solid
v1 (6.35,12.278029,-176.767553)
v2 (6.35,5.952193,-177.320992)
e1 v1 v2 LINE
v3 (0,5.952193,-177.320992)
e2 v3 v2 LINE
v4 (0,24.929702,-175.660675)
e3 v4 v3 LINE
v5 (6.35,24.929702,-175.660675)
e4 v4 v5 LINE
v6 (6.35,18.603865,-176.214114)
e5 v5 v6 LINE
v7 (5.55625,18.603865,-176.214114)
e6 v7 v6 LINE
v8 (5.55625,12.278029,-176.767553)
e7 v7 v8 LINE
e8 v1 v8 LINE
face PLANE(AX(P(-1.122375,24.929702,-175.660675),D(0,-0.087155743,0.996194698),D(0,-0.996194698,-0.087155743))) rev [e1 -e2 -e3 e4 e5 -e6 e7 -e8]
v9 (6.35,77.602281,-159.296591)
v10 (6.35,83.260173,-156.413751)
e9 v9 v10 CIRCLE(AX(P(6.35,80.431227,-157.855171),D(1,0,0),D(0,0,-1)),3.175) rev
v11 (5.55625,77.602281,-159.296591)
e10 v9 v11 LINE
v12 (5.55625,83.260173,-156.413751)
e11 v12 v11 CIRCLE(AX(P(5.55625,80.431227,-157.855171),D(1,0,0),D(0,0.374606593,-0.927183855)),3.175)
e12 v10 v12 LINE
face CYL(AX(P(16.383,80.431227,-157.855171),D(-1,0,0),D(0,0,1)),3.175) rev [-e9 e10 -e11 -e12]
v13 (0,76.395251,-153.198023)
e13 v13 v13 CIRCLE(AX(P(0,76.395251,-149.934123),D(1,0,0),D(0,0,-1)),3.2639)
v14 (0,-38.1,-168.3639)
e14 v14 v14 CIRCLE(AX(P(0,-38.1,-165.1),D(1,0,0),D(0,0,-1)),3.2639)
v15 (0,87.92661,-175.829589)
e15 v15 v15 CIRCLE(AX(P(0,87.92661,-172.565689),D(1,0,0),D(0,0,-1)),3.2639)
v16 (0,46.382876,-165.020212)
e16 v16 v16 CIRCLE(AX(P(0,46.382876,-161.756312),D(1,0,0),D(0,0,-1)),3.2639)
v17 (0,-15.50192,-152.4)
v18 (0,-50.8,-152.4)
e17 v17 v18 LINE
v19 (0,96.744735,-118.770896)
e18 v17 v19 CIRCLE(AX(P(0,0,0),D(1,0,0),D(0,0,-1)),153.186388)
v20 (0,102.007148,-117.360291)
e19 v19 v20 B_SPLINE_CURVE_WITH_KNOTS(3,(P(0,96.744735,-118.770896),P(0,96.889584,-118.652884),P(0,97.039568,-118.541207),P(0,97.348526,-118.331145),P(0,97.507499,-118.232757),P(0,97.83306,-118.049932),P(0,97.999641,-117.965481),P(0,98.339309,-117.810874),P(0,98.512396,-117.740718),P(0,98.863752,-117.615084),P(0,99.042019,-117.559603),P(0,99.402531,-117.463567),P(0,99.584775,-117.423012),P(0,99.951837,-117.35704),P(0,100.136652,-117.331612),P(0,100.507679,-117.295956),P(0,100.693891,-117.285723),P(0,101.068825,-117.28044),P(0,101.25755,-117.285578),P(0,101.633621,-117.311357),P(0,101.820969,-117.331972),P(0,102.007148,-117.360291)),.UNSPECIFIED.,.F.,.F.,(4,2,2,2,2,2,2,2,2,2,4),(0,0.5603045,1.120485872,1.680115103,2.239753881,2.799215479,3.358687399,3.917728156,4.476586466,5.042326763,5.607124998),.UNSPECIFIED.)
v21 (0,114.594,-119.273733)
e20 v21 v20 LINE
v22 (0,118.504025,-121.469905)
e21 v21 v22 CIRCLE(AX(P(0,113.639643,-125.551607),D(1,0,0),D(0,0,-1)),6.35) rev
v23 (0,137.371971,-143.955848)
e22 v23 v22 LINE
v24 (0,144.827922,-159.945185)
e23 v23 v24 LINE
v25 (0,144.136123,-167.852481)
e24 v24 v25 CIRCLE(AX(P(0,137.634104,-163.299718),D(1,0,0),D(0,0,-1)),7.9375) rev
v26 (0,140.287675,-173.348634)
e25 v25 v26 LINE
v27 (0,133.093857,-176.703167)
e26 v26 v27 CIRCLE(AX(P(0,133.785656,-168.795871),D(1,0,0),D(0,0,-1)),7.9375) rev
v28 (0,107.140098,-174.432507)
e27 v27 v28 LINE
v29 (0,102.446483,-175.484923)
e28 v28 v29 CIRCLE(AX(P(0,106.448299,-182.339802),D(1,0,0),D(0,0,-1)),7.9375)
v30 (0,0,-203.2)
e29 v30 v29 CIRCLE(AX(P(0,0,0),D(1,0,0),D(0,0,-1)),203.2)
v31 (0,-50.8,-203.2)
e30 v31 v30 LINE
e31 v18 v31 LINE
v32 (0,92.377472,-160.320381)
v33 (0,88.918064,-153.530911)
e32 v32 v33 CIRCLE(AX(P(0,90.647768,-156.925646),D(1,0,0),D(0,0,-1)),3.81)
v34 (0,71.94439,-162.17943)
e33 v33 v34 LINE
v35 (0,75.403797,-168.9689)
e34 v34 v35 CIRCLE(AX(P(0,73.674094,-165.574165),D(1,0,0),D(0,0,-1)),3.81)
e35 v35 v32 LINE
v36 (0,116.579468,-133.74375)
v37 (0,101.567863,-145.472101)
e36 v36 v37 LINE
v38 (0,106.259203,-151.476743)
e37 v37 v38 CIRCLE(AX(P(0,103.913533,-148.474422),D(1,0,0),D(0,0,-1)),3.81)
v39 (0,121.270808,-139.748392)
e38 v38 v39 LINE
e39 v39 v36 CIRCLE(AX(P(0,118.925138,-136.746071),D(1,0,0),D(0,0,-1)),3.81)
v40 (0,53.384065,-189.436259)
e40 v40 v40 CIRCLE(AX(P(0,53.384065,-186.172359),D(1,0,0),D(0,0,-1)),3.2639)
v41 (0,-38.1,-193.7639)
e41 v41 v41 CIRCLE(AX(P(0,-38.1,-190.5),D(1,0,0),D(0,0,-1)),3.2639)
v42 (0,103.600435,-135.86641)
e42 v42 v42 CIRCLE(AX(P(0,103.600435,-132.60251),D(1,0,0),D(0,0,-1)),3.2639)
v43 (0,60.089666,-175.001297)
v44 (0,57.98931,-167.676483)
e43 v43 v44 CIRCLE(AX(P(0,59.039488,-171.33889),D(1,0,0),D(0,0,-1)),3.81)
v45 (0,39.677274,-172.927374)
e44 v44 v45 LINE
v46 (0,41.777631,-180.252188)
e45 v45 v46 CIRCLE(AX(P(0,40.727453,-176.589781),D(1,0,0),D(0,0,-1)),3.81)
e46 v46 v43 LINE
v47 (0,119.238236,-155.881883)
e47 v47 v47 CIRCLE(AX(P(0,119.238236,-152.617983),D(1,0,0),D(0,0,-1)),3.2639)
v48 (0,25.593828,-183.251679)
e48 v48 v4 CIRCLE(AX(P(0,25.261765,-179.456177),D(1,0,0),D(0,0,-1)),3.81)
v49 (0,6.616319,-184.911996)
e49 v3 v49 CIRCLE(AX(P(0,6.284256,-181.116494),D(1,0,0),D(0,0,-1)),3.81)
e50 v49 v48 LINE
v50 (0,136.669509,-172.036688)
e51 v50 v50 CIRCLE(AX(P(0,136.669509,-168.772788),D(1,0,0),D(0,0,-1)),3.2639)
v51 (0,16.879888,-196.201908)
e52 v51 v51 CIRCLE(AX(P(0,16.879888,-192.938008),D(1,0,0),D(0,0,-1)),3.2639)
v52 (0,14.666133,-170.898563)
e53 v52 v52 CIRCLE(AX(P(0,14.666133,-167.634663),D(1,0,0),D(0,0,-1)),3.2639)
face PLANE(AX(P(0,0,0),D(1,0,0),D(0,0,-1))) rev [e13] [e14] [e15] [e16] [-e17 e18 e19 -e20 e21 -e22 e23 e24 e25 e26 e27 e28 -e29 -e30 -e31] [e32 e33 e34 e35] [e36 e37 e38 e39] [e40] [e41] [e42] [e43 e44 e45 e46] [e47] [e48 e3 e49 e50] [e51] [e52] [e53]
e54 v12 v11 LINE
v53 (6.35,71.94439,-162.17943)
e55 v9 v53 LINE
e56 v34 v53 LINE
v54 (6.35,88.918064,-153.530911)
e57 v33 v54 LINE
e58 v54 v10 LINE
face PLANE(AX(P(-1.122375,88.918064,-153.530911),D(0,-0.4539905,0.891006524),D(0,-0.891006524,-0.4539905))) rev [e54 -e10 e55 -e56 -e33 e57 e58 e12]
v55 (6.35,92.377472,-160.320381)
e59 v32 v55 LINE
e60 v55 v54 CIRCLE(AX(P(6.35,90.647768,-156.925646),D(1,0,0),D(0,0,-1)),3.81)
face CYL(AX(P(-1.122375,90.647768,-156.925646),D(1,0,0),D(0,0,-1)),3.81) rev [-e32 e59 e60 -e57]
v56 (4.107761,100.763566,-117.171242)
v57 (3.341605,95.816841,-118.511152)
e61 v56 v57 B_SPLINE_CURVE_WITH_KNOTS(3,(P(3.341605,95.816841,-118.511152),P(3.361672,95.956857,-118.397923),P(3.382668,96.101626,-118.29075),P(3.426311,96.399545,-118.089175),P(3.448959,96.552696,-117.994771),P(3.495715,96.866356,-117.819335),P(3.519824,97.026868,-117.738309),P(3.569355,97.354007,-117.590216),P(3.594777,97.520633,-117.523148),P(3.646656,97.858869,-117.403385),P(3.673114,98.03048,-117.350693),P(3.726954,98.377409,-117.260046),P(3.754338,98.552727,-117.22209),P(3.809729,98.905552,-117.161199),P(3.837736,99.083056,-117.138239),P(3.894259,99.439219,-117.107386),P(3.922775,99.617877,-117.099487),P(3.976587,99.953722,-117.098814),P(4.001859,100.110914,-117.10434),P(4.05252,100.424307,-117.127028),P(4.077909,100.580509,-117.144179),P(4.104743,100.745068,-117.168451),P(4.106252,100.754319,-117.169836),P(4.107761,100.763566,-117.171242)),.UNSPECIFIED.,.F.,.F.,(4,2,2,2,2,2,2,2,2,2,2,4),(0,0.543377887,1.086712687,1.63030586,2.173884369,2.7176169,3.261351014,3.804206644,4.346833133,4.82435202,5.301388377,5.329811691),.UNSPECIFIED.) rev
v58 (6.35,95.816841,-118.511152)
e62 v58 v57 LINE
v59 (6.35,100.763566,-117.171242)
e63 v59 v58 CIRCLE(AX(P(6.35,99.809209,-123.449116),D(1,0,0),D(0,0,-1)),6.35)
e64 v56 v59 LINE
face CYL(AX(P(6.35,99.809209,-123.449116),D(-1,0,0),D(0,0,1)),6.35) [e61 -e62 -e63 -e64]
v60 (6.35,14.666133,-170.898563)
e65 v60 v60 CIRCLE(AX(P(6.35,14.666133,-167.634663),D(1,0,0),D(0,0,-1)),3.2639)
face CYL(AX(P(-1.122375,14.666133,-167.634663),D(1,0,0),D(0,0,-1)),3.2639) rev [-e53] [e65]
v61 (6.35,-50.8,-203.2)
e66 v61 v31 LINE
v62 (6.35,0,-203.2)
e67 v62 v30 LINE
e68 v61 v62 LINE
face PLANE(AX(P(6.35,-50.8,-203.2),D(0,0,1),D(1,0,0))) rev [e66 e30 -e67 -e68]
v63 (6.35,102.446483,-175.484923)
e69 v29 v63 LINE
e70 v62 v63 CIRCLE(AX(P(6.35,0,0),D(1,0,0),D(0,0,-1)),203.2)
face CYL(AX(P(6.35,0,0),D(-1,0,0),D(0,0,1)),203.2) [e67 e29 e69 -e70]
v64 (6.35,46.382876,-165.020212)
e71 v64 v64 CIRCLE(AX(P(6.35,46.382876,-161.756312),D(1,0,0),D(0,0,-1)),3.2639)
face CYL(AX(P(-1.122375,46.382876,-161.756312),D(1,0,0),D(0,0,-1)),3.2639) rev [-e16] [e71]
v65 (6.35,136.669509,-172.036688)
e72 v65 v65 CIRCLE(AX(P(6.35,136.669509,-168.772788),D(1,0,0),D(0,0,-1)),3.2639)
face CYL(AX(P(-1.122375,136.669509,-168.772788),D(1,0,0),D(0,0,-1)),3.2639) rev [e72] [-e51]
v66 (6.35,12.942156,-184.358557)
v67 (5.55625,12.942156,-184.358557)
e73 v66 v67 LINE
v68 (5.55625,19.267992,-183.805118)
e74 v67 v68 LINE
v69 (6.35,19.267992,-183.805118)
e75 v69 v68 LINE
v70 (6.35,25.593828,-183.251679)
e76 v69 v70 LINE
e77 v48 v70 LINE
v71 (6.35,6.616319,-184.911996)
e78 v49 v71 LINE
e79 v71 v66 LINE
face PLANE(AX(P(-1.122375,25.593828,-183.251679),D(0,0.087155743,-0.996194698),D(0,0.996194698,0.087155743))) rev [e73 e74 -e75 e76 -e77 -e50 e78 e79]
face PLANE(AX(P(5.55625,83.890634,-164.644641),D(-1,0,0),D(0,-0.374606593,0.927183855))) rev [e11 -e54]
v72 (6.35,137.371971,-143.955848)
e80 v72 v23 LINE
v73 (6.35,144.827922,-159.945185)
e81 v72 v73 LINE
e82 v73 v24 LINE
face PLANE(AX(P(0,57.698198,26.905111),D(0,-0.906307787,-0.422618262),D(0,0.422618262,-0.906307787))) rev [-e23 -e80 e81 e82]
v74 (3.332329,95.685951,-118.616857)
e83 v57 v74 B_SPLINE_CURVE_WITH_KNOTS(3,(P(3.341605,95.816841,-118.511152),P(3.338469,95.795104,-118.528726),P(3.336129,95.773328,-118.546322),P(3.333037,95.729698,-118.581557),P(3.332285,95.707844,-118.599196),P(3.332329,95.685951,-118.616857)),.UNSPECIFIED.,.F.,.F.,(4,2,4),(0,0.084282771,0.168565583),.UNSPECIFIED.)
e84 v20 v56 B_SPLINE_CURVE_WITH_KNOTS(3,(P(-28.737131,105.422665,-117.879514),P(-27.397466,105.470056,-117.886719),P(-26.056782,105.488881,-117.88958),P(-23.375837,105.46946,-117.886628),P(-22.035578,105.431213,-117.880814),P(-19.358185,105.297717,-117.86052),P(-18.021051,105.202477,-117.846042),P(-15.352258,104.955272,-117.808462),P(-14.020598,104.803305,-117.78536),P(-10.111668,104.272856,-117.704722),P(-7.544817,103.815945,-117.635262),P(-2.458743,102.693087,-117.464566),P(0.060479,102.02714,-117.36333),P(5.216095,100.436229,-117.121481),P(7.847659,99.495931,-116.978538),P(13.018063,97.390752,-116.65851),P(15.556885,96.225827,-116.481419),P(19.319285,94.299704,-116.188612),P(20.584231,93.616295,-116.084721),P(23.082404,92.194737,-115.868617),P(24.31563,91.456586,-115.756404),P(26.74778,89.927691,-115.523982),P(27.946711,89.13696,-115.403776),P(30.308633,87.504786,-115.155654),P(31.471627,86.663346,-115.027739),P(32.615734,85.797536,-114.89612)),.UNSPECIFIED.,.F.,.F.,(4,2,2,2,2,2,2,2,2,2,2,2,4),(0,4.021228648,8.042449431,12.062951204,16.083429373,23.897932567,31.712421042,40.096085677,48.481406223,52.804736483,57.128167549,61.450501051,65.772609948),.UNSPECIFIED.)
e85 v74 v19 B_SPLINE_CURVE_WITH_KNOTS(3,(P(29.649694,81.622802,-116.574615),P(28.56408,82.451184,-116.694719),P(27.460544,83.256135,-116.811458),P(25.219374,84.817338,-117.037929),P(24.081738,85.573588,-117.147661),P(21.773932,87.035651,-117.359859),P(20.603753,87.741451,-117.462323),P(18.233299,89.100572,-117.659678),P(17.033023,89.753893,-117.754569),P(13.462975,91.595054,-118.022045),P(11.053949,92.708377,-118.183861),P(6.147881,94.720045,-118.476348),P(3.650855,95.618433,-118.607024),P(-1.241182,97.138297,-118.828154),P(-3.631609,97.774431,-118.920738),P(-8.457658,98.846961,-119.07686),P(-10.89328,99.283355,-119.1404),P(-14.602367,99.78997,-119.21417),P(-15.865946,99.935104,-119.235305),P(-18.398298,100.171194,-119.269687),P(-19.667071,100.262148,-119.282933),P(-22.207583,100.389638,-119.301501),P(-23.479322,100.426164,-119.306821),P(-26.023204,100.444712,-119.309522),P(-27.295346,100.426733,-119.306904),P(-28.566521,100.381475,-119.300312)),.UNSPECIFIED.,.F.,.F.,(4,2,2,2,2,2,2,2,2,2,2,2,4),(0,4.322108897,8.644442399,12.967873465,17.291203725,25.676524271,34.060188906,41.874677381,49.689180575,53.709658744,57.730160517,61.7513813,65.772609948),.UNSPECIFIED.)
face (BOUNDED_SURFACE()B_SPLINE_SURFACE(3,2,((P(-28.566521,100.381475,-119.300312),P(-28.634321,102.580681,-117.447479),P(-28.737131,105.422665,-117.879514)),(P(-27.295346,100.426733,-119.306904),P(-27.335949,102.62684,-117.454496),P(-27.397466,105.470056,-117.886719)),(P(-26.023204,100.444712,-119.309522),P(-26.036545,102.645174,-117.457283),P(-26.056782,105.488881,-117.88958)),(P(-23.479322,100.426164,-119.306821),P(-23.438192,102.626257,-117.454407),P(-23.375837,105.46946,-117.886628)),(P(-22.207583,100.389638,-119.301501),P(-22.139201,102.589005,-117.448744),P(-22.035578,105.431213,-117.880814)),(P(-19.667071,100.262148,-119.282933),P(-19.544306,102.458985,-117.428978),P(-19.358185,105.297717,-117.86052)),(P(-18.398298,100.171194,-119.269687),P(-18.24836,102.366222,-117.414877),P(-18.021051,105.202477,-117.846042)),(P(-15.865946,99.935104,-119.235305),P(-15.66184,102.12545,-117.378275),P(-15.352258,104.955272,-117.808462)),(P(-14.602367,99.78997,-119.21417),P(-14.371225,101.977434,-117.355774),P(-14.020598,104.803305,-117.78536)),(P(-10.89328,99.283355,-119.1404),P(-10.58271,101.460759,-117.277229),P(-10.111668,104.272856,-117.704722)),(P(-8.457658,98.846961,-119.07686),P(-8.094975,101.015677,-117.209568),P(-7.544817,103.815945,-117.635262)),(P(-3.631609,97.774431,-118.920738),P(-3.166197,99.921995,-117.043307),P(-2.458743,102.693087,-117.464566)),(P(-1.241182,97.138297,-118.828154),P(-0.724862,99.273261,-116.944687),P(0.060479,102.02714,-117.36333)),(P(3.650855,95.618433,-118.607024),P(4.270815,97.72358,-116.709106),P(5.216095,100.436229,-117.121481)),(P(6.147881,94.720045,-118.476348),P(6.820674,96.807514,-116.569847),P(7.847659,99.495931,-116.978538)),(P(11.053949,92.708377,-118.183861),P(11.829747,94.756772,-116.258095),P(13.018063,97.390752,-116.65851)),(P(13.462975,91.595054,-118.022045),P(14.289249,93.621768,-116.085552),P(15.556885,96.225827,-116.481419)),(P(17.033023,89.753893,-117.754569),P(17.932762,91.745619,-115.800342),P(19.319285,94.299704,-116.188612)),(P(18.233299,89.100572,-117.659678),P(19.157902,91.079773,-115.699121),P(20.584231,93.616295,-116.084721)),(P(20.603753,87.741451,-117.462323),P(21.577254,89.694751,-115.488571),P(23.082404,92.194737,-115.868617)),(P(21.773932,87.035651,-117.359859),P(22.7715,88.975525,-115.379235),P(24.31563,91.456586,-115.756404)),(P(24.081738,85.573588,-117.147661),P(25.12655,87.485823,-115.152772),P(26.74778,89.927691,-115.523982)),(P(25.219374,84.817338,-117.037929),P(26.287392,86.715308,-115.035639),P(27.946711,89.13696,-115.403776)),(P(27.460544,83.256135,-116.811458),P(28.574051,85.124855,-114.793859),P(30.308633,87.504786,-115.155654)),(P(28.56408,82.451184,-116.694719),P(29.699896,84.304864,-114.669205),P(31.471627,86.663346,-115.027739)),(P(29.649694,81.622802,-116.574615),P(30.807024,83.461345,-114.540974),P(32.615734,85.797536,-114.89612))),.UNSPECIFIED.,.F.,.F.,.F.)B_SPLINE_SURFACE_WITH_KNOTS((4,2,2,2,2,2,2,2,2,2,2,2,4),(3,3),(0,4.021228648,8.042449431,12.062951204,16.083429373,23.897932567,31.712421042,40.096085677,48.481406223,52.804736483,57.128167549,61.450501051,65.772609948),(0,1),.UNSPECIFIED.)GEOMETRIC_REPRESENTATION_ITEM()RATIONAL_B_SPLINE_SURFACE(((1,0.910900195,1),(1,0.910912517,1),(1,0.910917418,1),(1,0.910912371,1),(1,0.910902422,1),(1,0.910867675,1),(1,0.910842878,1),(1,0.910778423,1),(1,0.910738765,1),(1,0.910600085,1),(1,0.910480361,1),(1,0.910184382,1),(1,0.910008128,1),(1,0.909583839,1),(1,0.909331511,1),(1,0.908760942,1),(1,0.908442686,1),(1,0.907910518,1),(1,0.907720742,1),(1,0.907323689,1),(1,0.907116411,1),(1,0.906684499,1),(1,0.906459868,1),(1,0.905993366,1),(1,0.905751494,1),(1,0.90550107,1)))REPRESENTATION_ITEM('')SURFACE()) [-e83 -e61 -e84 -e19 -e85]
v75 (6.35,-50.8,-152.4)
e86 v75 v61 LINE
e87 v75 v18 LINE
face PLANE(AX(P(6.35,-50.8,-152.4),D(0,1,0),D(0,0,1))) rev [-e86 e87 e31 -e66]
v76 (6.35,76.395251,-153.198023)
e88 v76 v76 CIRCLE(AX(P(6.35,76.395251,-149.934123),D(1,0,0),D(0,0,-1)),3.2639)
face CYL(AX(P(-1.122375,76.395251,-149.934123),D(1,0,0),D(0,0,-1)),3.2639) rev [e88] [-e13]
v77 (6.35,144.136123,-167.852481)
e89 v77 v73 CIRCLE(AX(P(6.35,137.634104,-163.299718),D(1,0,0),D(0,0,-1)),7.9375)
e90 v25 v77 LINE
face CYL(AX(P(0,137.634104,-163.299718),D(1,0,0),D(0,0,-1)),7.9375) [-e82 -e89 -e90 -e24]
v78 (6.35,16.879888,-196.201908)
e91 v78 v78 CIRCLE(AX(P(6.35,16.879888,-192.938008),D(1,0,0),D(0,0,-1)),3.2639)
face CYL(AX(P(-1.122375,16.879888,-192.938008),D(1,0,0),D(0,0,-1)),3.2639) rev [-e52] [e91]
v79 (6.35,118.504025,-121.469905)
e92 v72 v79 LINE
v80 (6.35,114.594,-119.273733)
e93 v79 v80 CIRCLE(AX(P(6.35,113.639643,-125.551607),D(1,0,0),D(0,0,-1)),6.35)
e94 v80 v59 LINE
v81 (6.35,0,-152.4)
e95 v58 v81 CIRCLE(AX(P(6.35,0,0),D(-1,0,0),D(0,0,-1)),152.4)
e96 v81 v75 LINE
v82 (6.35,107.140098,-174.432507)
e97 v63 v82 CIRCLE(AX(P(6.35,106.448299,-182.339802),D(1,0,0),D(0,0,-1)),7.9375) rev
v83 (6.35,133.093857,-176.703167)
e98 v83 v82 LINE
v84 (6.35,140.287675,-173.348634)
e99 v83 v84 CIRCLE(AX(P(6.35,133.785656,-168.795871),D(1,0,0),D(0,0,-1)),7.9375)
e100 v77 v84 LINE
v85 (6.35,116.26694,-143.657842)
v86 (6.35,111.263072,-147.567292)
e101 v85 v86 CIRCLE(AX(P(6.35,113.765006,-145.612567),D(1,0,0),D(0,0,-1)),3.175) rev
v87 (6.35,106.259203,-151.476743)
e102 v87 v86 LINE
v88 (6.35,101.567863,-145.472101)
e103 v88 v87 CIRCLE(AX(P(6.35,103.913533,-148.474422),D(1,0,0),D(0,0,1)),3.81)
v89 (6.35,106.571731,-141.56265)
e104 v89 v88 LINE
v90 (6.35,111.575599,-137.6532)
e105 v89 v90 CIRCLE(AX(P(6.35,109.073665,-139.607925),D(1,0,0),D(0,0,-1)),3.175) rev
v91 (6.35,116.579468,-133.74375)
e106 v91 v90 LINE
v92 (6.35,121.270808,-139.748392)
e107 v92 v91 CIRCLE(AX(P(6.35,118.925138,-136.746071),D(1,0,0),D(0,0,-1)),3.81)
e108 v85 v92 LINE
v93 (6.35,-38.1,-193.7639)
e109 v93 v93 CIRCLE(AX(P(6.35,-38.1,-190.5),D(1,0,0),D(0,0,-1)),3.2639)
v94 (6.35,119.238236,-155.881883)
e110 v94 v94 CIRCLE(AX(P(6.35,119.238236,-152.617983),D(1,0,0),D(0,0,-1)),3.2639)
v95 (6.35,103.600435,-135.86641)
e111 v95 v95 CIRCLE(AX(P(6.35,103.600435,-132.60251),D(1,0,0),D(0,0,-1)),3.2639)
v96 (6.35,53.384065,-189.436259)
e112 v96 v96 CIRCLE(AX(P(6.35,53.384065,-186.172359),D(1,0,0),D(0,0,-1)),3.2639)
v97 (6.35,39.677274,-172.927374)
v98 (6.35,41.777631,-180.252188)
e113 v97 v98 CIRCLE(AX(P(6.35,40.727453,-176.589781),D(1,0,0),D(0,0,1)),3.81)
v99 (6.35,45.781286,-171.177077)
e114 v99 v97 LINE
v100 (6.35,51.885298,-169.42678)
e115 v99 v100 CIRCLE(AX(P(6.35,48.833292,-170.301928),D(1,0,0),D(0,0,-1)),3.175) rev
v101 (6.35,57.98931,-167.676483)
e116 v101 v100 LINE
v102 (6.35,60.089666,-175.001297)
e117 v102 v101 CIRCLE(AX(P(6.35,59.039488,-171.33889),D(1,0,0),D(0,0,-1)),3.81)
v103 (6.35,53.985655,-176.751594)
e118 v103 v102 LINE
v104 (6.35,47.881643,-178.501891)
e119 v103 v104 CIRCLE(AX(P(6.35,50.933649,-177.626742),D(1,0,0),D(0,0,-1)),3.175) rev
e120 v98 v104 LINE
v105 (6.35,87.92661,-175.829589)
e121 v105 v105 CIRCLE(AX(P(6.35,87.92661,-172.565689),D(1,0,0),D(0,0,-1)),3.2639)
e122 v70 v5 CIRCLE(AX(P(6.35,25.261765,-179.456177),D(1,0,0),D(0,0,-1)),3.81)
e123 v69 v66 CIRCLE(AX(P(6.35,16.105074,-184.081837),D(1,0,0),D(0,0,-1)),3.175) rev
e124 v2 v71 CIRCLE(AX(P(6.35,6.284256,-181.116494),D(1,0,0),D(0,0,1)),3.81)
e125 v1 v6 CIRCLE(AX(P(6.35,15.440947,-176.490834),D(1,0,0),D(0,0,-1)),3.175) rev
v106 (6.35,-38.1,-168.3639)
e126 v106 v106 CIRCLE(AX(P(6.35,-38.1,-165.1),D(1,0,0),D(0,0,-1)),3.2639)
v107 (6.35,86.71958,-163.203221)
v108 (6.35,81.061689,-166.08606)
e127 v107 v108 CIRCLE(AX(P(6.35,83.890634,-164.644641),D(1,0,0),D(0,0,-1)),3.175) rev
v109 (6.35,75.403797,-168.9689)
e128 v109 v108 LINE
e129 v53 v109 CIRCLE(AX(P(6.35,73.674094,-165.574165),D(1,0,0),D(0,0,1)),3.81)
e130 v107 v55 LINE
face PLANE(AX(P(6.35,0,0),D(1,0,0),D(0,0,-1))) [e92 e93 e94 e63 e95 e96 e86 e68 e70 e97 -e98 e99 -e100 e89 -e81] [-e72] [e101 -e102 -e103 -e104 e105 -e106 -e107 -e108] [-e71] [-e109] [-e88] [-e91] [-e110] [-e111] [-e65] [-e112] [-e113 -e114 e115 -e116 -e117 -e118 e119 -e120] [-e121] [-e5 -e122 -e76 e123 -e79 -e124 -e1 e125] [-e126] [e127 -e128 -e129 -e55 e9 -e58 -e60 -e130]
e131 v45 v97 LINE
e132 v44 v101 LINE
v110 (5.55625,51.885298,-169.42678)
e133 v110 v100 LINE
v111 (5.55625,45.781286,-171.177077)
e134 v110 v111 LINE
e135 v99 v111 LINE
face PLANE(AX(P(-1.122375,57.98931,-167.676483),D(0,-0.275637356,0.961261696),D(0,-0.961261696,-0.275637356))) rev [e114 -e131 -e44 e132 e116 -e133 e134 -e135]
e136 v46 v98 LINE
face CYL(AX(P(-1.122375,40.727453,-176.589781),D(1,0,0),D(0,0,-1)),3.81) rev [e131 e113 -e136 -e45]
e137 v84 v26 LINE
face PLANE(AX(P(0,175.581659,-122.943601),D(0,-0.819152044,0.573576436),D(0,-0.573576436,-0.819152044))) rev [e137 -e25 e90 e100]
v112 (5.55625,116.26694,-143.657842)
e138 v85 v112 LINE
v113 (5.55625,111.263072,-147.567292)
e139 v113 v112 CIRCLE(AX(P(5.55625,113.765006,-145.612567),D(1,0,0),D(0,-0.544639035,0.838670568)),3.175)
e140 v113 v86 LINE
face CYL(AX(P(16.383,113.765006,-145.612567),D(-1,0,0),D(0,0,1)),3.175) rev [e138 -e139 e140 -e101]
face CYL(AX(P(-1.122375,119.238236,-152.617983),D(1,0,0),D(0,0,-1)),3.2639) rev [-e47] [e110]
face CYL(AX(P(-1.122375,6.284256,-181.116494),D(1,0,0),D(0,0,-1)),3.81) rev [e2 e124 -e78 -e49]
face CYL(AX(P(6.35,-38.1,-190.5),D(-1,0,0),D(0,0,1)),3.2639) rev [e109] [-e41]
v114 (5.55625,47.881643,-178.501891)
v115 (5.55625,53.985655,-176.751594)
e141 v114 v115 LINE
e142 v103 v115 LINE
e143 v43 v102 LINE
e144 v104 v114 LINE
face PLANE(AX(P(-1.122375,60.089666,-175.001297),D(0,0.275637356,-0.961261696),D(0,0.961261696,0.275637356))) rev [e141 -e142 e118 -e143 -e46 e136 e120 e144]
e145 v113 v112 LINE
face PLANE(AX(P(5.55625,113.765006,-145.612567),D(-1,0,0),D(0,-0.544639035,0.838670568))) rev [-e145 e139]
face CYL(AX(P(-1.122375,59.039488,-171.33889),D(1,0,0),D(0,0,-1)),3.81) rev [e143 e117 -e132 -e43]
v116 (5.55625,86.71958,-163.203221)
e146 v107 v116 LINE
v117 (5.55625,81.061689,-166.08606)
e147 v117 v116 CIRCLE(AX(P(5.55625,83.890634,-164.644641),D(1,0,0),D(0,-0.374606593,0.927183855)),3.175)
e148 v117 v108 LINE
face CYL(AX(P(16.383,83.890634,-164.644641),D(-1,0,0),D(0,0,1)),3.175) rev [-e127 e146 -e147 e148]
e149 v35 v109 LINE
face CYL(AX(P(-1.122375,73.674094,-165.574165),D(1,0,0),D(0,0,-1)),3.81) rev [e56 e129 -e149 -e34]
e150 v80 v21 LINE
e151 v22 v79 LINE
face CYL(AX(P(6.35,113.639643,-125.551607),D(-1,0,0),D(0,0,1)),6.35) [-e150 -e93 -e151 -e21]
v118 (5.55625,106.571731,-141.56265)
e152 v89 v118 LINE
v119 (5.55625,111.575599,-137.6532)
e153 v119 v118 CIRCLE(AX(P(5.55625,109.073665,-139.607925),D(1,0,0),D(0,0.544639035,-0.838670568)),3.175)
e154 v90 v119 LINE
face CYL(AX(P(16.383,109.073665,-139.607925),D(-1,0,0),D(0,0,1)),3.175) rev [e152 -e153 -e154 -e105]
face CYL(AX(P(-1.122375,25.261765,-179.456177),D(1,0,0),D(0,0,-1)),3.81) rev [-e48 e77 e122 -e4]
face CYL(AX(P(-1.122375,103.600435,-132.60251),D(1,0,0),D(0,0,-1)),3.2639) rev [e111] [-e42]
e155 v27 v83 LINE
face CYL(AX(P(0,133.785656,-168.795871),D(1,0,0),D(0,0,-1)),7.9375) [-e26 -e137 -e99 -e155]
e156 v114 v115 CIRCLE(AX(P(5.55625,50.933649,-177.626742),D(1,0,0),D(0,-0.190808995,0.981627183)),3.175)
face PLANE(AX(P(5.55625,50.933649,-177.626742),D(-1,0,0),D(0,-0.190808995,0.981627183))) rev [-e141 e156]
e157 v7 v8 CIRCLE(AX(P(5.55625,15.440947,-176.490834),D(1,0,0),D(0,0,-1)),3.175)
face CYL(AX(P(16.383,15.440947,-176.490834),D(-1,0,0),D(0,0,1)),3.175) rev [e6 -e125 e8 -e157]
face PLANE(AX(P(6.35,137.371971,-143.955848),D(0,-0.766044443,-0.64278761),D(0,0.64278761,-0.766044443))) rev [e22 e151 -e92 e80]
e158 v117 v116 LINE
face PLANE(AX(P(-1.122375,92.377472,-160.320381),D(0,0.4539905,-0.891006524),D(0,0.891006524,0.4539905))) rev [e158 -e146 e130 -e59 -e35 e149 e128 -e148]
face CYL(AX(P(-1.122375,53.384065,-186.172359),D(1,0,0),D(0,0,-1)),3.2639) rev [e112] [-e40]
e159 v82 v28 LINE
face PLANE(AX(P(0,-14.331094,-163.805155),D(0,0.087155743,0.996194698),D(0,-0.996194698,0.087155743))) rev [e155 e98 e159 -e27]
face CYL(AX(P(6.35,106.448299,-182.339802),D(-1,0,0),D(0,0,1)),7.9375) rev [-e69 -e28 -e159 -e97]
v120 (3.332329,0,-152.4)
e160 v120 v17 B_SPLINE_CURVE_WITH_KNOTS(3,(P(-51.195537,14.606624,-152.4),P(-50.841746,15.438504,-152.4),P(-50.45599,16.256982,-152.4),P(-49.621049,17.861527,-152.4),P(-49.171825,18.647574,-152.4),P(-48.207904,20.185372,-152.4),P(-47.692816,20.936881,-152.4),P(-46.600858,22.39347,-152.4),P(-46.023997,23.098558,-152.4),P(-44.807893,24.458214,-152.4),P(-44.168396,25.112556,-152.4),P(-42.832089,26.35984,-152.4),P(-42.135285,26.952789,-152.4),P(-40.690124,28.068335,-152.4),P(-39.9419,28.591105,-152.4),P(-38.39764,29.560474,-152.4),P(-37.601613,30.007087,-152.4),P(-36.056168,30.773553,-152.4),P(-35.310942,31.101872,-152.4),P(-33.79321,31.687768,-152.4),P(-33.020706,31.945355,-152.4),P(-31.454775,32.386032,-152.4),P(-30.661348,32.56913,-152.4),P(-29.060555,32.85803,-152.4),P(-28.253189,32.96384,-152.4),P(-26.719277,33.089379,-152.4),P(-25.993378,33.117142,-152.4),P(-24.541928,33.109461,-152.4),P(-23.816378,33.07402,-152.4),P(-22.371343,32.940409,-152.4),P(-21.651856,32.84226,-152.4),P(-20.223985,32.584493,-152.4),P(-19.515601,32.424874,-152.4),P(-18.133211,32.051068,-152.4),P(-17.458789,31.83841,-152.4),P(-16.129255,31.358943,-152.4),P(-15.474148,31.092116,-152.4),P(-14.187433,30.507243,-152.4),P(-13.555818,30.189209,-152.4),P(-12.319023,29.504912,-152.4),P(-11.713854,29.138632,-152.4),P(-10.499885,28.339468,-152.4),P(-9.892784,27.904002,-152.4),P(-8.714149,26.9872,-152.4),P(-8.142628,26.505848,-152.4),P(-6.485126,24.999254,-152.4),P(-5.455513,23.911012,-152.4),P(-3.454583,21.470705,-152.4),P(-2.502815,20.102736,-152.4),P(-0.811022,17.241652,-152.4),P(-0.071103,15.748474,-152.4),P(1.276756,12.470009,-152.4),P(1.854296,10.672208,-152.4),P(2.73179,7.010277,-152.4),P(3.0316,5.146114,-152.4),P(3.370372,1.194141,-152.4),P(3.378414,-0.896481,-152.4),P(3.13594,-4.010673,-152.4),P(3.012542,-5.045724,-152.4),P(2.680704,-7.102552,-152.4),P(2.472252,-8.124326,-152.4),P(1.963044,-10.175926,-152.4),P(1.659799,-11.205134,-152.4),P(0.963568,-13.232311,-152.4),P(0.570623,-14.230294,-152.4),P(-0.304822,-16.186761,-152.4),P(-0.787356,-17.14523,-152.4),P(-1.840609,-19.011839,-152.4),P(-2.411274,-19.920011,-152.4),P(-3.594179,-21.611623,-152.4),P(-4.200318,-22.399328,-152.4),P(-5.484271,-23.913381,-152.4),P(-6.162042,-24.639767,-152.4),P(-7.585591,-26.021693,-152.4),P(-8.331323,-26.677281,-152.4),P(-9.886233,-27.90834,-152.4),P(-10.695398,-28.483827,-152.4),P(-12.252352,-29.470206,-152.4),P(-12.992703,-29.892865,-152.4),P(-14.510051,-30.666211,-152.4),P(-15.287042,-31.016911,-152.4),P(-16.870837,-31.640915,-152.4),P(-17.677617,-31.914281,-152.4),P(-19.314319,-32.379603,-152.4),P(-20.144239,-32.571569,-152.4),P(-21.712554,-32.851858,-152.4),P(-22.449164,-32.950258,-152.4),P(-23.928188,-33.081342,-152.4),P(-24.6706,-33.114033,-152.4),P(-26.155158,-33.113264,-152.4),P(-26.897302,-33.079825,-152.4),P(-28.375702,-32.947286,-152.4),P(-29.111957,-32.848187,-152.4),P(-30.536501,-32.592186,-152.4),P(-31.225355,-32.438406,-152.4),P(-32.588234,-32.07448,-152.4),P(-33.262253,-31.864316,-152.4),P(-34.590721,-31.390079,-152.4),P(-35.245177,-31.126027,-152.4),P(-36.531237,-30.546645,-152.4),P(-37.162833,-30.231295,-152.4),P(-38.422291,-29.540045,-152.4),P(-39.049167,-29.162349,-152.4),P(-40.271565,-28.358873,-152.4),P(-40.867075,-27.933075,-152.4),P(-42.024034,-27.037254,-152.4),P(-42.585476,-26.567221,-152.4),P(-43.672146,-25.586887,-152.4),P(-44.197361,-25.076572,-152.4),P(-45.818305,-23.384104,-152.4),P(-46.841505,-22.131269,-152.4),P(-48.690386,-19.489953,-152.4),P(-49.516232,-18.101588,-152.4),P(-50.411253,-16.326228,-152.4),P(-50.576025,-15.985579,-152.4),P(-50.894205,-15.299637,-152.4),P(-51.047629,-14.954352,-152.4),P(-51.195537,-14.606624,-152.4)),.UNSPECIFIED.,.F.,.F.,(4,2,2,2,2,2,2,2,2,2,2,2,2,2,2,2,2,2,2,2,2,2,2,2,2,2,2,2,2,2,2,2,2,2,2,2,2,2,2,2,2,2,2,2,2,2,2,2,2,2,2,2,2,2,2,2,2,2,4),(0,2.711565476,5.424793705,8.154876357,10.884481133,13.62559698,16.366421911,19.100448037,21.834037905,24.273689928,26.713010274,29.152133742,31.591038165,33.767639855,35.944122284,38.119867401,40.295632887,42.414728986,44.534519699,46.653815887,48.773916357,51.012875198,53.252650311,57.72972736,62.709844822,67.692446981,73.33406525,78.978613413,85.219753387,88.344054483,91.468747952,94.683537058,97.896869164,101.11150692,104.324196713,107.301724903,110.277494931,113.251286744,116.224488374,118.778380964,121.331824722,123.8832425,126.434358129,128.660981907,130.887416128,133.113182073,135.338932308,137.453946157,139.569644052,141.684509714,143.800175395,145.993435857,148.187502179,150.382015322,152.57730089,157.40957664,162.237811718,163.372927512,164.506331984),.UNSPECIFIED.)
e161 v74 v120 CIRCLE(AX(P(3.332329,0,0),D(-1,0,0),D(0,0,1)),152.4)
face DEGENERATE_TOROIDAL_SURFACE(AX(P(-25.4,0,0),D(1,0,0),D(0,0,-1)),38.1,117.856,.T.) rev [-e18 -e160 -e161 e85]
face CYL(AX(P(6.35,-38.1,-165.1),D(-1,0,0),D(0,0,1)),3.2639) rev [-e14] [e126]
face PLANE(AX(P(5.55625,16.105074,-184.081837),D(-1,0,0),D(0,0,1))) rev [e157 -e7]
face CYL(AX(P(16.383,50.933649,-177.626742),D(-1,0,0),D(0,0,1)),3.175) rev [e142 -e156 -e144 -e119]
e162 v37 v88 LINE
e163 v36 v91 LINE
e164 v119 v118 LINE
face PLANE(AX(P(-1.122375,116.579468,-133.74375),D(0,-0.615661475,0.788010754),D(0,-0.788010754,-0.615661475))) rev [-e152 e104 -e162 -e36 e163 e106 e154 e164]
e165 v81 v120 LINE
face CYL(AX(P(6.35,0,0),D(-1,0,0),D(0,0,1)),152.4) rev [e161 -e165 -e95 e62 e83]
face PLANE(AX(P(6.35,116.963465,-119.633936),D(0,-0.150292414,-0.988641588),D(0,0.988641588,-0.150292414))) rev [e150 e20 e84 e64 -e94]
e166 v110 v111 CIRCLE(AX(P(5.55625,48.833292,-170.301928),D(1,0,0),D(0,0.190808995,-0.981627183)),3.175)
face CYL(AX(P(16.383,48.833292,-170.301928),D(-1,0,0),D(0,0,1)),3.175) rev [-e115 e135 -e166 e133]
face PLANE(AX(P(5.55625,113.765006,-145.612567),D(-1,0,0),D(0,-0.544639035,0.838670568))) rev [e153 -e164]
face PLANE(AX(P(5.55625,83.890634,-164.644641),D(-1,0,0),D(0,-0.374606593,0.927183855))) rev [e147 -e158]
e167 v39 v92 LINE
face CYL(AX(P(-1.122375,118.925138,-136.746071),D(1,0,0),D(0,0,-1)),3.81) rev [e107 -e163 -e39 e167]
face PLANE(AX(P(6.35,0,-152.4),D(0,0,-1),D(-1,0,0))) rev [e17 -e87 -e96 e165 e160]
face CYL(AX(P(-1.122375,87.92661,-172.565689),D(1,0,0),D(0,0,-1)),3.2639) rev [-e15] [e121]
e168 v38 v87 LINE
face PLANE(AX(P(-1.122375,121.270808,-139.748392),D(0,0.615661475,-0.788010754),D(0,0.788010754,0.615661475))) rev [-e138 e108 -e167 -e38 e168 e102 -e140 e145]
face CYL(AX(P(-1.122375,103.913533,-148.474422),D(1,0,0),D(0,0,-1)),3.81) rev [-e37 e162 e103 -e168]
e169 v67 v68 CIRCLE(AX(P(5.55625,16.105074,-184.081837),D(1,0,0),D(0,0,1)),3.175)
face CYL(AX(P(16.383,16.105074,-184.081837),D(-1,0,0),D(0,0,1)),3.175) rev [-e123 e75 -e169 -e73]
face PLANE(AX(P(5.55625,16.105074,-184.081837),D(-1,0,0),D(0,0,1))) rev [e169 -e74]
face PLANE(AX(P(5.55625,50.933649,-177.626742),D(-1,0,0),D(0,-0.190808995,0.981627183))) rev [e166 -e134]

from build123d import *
from build123d.topology import SkipClean

# Parameters (mm, degrees)
SKETCH1_R               = 3.2639
BOSS_EXTRUDE1_DEPTH     = 6.35
FILLET1_R               = 6.35
SKETCH6_R               = 3.2639
CUT_EXTRUDE1_DEPTH      = 246.360186308
CUT_EXTRUDE2_START      = -0.79375
CUT_EXTRUDE2_DEPTH      = 10.82675
CIRPATTERN1_COUNT       = 4
CIRPATTERN1_ANGLE       = 33
BOSS_EXTRUDE2_DEPTH     = 6.35
CUT_EXTRUDE3_DEPTH      = 251.739762675
CUT_EXTRUDE3_DEPTH_BACK = 251.739762675
SKETCH9_R               = 3.2639
FILLET2_R               = 7.9375


with BuildPart() as part:
    # Sketch1 → Boss-Extrude1 (new body)
    with BuildSketch(Plane(origin=(0, 0, 0), x_dir=(0, 0, -1), z_dir=(1, 0, 0))):
        with BuildLine():
            Line((152.4, 0), (152.4, -50.8))
            Line((152.4, -50.8), (203.2, -50.8))
            Line((203.2, -50.8), (203.2, 0))
            ThreePointArc((203.2, 0), (190.945540544, 69.498493124), (155.660230842, 130.614442288))
            Line((155.660230842, 130.614442288), (143.955847531, 137.371971144))
            Line((143.955847531, 137.371971144), (119.633936462, 116.963464536))
            Line((119.633936462, 116.963464536), (116.745173131, 97.960831716))
            ThreePointArc((116.745173131, 97.960831716), (143.209155408, 52.123869843), (152.4, 0))
        make_face()
        with Locations((165.1, -38.1)):
            Circle(SKETCH1_R, mode=Mode.SUBTRACT)
        with Locations((190.5, -38.1)):
            Circle(SKETCH1_R, mode=Mode.SUBTRACT)
    extrude(amount=BOSS_EXTRUDE1_DEPTH)

    # Sketch2 → Cut-Revolve2 (revolve, cut)
    with SkipClean():  # the faces are left unmerged after this step: merging them gives an invalid solid
        with BuildSketch(Plane(origin=(0, 0, 0), x_dir=(1, 0, 0), z_dir=(0, 1, 0))):
            with BuildLine():
                Line((-143.256, 38.1), (-25.4, 38.1))
                Line((-25.4, 38.1), (92.456, 38.1))
                ThreePointArc((92.456, 38.1), (-25.4, 155.956), (-143.256, 38.1))
            make_face()
        revolve(axis=Axis((0, 0, 0), (-1, 0, 0)), mode=Mode.SUBTRACT)
    add(part.part.scale(1), mode=Mode.REPLACE)  # the faces are merged on a copy

    # Fillet1
    fillet1_edges = [part.edges().sort_by_distance(p)[0] for p in [
        (4.841164554, 97.960831716, -116.745173131),
        (1.671163996, 98.49343633, -116.826139211),
        (3.175, 116.963464536, -119.633936462),
        (3.175, 130.614442288, -155.660230842),
    ]]
    fillet(fillet1_edges, radius=FILLET1_R)

    # Sketch6 → Cut-Extrude1 (cut, through all)
    with BuildSketch(Plane(origin=(6.35, 0, 0), x_dir=(0, 0, -1), z_dir=(1, 0, 0))):
        with Locations((167.634662821, 14.666132611)):
            Circle(SKETCH6_R)
        with Locations((192.938008153, 16.879888477)):
            Circle(SKETCH6_R)
        with Locations((161.756311884, 46.38287605)):
            Circle(SKETCH6_R)
        with Locations((186.172358961, 53.384064888)):
            Circle(SKETCH6_R)
        with Locations((149.934122858, 76.395251344)):
            Circle(SKETCH6_R)
        with Locations((172.565688572, 87.926610037)):
            Circle(SKETCH6_R)
        with Locations((132.602509563, 103.60043476)):
            Circle(SKETCH6_R)
        with Locations((152.617982705, 119.238236234)):
            Circle(SKETCH6_R)
        with BuildLine():
            Line((167.676482547, 57.989309797), (172.927374175, 39.67727449))
            ThreePointArc((172.927374175, 39.67727449), (177.639959562, 37.065045754), (180.252188298, 41.777631141))
            Line((180.252188298, 41.777631141), (175.00129667, 60.089666448))
            ThreePointArc((175.00129667, 60.089666448), (170.288711283, 62.701895184), (167.676482547, 57.989309797))
        make_face()
        with BuildLine():
            Line((153.530911348, 88.918064029), (162.179430368, 71.944389743))
            ThreePointArc((162.179430368, 71.944389743), (167.303869029, 70.27935869), (168.968900082, 75.403797351))
            Line((168.968900082, 75.403797351), (160.320381062, 92.377471637))
            ThreePointArc((160.320381062, 92.377471637), (155.195942401, 94.04250269), (153.530911348, 88.918064029))
        make_face()
        with BuildLine():
            Line((175.660675238, 24.929701663), (177.320992137, 5.952192665))
            ThreePointArc((177.320992137, 5.952192665), (181.448557317, 2.488754245), (184.911995737, 6.616319424))
            Line((184.911995737, 6.616319424), (183.251678837, 25.593828423))
            ThreePointArc((183.251678837, 25.593828423), (179.124113658, 29.057266843), (175.660675238, 24.929701663))
        make_face()
        with BuildLine():
            Line((139.748391553, 121.270808146), (151.476742658, 106.25920329))
            ThreePointArc((151.476742658, 106.25920329), (150.820091907, 100.911212098), (145.472100715, 101.567862848))
            Line((145.472100715, 101.567862848), (133.74374961, 116.579467704))
            ThreePointArc((133.74374961, 116.579467704), (134.400400361, 121.927458896), (139.748391553, 121.270808146))
        make_face()
    extrude(amount=-CUT_EXTRUDE1_DEPTH, mode=Mode.SUBTRACT)

    # Sketch8 → Cut-Extrude2 (cut)
    with BuildSketch(Plane(origin=(6.35, 15.551634957, -177.756000954), x_dir=(0, 0.08715574274765883, -0.9961946980917454), z_dir=(1, 0, 0)).offset(CUT_EXTRUDE2_START)):
        with BuildLine():
            Line((6.35, 3.175), (-1.27, 3.175))
            ThreePointArc((-1.27, 3.175), (-4.445, 0), (-1.27, -3.175))
            Line((-1.27, -3.175), (6.35, -3.175))
            ThreePointArc((6.35, -3.175), (9.525, 0), (6.35, 3.175))
        make_face()
    cut_extrude2 = extrude(amount=CUT_EXTRUDE2_DEPTH, mode=Mode.SUBTRACT)

    # CirPattern1: Cut-Extrude2 ×4 about axis
    cirpattern1_axis = Axis((6.35, 0, 0), (1, 0, 0))
    for i in range(1, CIRPATTERN1_COUNT):
        add(cut_extrude2.rotate(cirpattern1_axis, i * CIRPATTERN1_ANGLE / (CIRPATTERN1_COUNT - 1)), mode=Mode.SUBTRACT)

    # Sketch11 → Boss-Extrude2 (add)
    with BuildSketch(Plane(origin=(6.35, 0, 0), x_dir=(0, 0, -1), z_dir=(1, 0, 0))):
        with BuildLine():
            Line((164.098538098, 146.764662011), (143.955847531, 137.371971144))
            Line((143.955847531, 137.371971144), (154.682623198, 131.178864325))
            ThreePointArc((154.682623198, 131.178864325), (155.603036102, 130.532446831), (156.394965882, 129.733783753))
            ThreePointArc((156.394965882, 129.733783753), (165.779619803, 117.504713343), (174.21022582, 104.599413095))
            Line((174.21022582, 104.599413095), (177.102576801, 137.659136084))
            Line((177.102576801, 137.659136084), (164.098538098, 146.764662011))
        make_face()
    extrude(amount=-BOSS_EXTRUDE2_DEPTH)

    # Sketch9 → Cut-Extrude3 (cut, two sides: drawn at the far end of the back side and taken through both)
    with BuildSketch(Plane(origin=(6.35, 0, 0), x_dir=(0, 0, -1), z_dir=(1, 0, 0)).offset(-CUT_EXTRUDE3_DEPTH_BACK)):
        with Locations((168.77278845, 136.669509324)):
            Circle(SKETCH9_R)
    extrude(amount=CUT_EXTRUDE3_DEPTH + CUT_EXTRUDE3_DEPTH_BACK, mode=Mode.SUBTRACT)

    # Fillet2
    fillet2_edges = [part.edges().sort_by_distance(p)[0] for p in [
        (3.175, 137.659136084, -177.102576801),
        (3.175, 146.764662011, -164.098538098),
        (3.175, 104.599413095, -174.21022582),
    ]]
    fillet(fillet2_edges, radius=FILLET2_R)


solid = part.part
